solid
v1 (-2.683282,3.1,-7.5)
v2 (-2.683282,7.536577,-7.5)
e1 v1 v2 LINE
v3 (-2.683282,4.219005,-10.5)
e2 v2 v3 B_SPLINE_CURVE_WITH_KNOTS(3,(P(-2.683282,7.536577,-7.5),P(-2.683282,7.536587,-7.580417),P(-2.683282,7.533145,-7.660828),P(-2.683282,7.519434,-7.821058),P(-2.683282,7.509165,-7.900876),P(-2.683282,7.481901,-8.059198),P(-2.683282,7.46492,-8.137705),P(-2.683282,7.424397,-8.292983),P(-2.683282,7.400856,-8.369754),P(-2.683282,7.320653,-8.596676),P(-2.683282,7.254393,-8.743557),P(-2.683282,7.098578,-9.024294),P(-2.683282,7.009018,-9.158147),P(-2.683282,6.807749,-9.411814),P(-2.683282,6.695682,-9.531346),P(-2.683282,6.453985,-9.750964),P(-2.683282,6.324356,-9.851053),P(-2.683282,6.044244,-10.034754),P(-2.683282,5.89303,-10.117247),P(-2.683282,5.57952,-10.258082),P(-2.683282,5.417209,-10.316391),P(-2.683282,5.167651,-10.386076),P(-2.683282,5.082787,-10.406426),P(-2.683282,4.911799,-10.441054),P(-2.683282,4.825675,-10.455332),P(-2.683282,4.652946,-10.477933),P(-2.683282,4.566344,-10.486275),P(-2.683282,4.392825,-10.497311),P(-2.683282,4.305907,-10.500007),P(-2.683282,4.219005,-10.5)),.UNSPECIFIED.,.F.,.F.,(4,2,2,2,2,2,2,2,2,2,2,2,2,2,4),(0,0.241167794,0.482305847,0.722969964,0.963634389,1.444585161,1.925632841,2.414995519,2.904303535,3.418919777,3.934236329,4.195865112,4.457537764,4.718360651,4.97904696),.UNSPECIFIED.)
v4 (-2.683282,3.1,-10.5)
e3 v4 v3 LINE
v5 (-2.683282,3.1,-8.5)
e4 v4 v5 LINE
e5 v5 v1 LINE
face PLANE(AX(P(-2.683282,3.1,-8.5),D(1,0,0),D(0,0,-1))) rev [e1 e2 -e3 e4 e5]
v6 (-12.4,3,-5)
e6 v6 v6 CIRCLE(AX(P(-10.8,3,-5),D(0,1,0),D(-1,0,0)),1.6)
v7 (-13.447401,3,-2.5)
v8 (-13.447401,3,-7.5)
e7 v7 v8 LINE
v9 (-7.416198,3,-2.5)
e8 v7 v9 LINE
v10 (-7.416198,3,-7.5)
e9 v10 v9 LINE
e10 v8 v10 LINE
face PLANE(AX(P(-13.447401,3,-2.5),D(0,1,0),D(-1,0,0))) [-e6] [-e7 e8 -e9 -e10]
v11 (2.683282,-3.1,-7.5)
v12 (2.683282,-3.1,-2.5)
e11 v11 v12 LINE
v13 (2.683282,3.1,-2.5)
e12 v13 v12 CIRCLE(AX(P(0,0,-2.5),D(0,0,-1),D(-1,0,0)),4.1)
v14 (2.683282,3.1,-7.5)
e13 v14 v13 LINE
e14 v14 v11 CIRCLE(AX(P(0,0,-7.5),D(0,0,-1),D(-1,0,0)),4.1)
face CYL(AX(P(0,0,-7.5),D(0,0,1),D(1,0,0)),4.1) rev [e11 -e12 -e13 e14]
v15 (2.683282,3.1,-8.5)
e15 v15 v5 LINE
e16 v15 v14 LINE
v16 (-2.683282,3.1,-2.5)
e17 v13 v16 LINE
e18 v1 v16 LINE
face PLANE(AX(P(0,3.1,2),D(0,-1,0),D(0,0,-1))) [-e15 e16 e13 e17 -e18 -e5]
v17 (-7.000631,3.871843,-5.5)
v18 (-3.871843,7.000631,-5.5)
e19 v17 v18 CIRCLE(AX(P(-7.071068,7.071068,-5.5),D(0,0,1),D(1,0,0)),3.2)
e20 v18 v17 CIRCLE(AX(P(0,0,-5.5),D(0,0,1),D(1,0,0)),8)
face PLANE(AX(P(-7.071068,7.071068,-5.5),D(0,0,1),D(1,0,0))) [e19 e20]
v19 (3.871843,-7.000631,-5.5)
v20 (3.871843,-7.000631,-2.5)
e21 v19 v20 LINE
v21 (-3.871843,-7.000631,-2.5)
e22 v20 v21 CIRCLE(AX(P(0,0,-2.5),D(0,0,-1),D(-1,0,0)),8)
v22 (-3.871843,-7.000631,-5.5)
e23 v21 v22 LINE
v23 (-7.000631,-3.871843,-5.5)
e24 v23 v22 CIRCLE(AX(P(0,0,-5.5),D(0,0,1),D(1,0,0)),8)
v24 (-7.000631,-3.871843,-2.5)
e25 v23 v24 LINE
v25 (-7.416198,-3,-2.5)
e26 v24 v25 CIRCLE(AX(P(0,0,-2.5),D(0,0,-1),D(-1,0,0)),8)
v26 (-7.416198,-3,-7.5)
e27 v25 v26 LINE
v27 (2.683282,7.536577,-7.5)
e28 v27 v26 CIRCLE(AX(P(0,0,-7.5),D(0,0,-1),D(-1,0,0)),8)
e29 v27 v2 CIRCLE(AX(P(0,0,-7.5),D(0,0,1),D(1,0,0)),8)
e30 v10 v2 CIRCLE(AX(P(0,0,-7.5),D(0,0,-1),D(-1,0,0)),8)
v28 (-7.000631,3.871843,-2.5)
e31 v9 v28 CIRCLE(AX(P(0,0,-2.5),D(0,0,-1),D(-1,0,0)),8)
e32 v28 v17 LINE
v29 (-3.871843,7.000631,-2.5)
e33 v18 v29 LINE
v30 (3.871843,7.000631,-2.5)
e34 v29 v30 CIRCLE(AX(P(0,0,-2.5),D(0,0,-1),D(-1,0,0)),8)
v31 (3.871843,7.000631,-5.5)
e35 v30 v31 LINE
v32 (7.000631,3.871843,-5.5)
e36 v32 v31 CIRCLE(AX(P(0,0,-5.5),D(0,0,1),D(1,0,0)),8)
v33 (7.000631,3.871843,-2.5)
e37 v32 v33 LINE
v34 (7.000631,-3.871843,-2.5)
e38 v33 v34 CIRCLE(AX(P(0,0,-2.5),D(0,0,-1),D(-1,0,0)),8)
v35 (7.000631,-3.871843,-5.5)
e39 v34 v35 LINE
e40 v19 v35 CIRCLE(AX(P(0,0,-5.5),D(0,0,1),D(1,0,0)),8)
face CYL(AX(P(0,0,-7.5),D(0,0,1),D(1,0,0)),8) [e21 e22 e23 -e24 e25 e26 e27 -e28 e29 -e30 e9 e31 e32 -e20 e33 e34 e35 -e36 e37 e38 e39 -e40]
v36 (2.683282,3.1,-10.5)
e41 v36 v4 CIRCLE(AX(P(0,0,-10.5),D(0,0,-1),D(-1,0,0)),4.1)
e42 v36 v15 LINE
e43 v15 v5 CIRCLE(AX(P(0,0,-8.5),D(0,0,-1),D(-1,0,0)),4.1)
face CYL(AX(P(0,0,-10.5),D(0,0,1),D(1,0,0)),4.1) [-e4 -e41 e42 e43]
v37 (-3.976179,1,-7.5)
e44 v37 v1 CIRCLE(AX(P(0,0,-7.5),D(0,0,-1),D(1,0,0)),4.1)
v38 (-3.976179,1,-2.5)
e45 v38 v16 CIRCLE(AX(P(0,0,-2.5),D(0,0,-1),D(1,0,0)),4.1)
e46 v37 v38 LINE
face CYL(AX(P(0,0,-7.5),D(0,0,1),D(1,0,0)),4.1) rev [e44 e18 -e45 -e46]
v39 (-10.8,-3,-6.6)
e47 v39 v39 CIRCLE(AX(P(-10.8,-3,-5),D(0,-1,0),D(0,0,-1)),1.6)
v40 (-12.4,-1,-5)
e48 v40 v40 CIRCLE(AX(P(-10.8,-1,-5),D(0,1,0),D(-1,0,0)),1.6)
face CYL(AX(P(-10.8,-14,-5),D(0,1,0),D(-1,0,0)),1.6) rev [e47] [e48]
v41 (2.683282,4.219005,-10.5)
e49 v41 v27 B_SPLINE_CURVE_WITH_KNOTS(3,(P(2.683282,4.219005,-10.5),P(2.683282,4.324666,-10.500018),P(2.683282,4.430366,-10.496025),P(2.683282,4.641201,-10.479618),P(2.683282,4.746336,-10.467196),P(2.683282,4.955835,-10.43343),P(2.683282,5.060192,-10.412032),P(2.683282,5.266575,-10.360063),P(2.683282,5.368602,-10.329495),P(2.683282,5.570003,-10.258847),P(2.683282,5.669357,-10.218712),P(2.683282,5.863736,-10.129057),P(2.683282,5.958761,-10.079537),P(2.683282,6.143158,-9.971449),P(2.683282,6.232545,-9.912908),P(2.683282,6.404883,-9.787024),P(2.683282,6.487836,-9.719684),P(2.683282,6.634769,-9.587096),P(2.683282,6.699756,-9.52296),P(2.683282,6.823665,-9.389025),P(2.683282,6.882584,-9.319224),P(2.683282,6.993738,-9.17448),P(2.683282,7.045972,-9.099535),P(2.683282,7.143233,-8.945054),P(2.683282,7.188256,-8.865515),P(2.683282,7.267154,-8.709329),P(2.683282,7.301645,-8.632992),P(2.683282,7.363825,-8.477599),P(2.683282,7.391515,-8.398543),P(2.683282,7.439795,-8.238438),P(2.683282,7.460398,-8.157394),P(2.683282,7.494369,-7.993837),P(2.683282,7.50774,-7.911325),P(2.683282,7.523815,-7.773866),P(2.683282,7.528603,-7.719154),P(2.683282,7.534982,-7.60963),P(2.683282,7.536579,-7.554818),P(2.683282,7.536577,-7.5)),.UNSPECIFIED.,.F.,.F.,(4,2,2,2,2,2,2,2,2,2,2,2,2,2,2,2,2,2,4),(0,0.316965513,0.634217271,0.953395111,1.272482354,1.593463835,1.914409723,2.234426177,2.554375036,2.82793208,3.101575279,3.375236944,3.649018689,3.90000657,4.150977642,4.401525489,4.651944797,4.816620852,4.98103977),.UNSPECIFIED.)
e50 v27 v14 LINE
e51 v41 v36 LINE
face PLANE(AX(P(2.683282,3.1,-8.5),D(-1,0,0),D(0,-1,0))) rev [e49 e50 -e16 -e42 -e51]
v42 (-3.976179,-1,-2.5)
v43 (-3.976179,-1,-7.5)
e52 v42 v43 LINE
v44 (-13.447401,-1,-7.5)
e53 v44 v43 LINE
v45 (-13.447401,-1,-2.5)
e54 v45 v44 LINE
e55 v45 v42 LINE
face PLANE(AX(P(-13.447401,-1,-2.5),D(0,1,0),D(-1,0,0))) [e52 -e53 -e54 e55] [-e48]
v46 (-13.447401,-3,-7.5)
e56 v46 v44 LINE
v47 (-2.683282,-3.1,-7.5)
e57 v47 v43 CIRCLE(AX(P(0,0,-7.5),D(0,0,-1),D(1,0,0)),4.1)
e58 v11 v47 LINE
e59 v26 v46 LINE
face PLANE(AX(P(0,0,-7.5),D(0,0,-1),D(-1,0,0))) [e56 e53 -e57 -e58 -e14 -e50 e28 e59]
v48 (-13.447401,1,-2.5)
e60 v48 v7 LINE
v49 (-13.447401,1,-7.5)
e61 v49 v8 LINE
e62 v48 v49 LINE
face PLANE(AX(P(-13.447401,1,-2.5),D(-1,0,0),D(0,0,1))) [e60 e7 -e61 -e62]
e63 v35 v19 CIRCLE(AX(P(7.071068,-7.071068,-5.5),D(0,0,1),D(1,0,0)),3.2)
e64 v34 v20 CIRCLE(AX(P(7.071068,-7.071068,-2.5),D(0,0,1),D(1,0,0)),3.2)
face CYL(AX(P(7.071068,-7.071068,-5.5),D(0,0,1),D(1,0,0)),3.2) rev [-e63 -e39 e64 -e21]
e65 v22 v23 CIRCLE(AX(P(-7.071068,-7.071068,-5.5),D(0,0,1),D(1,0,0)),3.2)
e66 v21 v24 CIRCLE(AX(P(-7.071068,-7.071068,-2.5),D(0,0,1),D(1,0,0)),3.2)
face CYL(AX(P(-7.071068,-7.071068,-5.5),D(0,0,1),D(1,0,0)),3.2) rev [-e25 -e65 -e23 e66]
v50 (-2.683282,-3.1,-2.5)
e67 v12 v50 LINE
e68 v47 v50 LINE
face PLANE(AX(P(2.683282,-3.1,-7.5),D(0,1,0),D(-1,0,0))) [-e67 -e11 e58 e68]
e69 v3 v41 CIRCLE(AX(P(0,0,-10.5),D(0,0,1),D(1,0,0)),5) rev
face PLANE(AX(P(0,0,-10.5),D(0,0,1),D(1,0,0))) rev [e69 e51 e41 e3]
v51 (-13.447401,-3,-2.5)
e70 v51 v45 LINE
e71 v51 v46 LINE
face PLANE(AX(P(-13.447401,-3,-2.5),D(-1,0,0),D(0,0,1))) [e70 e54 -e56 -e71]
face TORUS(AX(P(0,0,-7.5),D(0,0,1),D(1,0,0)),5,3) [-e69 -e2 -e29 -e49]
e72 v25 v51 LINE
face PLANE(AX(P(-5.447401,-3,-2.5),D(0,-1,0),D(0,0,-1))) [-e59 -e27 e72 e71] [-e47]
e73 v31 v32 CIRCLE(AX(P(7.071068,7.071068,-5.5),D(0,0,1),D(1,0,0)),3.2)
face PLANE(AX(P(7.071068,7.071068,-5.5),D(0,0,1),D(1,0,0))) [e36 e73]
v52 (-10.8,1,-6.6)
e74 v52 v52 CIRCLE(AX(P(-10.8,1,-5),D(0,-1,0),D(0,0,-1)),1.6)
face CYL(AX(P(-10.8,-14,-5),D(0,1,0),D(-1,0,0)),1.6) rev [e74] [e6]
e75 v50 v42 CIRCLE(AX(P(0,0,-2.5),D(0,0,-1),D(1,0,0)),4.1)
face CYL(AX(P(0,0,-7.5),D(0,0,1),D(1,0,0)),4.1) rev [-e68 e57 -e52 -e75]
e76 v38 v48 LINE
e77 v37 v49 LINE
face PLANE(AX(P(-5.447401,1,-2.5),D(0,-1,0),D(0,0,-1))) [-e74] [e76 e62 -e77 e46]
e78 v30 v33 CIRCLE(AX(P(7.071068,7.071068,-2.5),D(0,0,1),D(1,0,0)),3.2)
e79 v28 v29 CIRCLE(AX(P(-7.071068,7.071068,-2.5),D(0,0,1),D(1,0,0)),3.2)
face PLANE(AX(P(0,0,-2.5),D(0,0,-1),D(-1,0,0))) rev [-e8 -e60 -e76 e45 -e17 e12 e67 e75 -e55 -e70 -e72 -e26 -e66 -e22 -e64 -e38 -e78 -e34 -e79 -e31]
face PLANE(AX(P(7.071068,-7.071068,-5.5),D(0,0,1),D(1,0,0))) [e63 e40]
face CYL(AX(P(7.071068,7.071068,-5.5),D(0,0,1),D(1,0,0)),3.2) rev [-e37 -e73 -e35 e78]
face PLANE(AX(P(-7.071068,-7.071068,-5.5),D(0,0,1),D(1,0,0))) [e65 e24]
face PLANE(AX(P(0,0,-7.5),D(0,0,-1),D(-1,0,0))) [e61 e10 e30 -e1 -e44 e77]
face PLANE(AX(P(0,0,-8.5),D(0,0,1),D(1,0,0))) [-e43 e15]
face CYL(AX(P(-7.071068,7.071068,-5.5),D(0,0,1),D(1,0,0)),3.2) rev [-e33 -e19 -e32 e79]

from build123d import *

# Parameters (mm, degrees)
SKETCH_1_R          = 14
SKETCH_1_R_2        = 1.5
EXTRUDE_1_DEPTH     = 2
CUT_EXTRUDE_1_DEPTH = 20.899748742
EXTRUDE_4_DEPTH     = 2.5
EXTRUDE_START       = 5
SKETCH_6_R          = 8
EXTRUDE_5_DEPTH     = 5
EXTRUDE_START_2     = 1
EXTRUDE_6_DEPTH     = 1
SKETCH_8_W          = 8
SKETCH_8_H          = 2
EXTRUDE_7_DEPTH     = 5
SKETCH_9_R          = 1.6
CUT_EXTRUDE_3_DEPTH = 24.606143268
EXTRUDE_START_3     = 2
EXTRUDE_8_DEPTH     = 2
SKETCH_11_W         = 12.041493288
SKETCH_11_H         = 2
CUT_EXTRUDE_4_DEPTH = 5
FILLET_2_R          = 3
CUT_EXTRUDE_START   = -4.5
SKETCH_12_R         = 14
CUT_EXTRUDE_5_DEPTH = 4.5
SKETCH_13_R         = 3.2
CUT_EXTRUDE_6_DEPTH = 3


with BuildPart() as part:
    # 草图1 → 凸台-拉伸1 (new body)
    with BuildSketch(Plane.XY):
        Circle(SKETCH_1_R)
        with Locations((-7.071067812, 7.071067812)):
            Circle(SKETCH_1_R_2, mode=Mode.SUBTRACT)
        with Locations((7.071067812, 7.071067812)):
            Circle(SKETCH_1_R_2, mode=Mode.SUBTRACT)
        with Locations((-7.071067812, -7.071067812)):
            Circle(SKETCH_1_R_2, mode=Mode.SUBTRACT)
        with Locations((7.071067812, -7.071067812)):
            Circle(SKETCH_1_R_2, mode=Mode.SUBTRACT)
    extrude(amount=EXTRUDE_1_DEPTH)

    # 草图2 → 切除-拉伸1 (cut, through all)
    with BuildSketch(Plane(origin=(0, 0, 0), x_dir=(-1, 0, 0), z_dir=(0, 0, -1))):
        with BuildLine():
            ThreePointArc((-2.683281573, 3.1), (-4.1, 0), (-2.683281573, -3.1))
            Line((-2.683281573, -3.1), (2.683281573, -3.1))
            ThreePointArc((2.683281573, -3.1), (4.1, 0), (2.683281573, 3.1))
            Line((2.683281573, 3.1), (-2.683281573, 3.1))
        make_face()
    extrude(amount=-CUT_EXTRUDE_1_DEPTH, mode=Mode.SUBTRACT)

    # 草图3 → 凸台-拉伸4 (add)
    with BuildSketch(Plane(origin=(0, 0, 0), x_dir=(-1, 0, 0), z_dir=(0, 0, -1))):
        Polygon((0, 3.1), (3.7, 3.1), (3.7, 7.1), (-3.7, 7.1), (-3.7, 3.1), align=None)
    extrude(amount=EXTRUDE_4_DEPTH)

    # 草图6 → 凸台-拉伸5 (add)
    with BuildSketch(Plane(origin=(0, 0, -2.5), x_dir=(-1, 0, 0), z_dir=(0, 0, -1)).offset(EXTRUDE_START)):
        Circle(SKETCH_6_R)
        with BuildLine():
            Line((-2.683281573, -3.1), (2.683281573, -3.1))
            ThreePointArc((2.683281573, -3.1), (4.1, 0), (2.683281573, 3.1))
            Line((2.683281573, 3.1), (-2.683281573, 3.1))
            ThreePointArc((-2.683281573, 3.1), (-4.1, 0), (-2.683281573, -3.1))
        make_face(mode=Mode.SUBTRACT)
    extrude(amount=-EXTRUDE_5_DEPTH)

    # 草图7 → 凸台-拉伸6 (add)
    with BuildSketch(Plane(origin=(0, 0, -7.5), x_dir=(-1, 0, 0), z_dir=(0, 0, -1)).offset(EXTRUDE_START_2)):
        with BuildLine():
            Line((-2.683281573, 3.1), (-2.683281573, 7.536577473))
            ThreePointArc((-2.683281573, 7.536577473), (0, 8), (2.683281573, 7.536577473))
            Line((2.683281573, 7.536577473), (2.683281573, 3.1))
            Line((2.683281573, 3.1), (-2.683281573, 3.1))
        make_face()
    extrude(amount=-EXTRUDE_6_DEPTH)

    # 草图8 → 凸台-拉伸7 (add)
    with BuildSketch(Plane(origin=(0, 0, -7.5), x_dir=(-1, 0, 0), z_dir=(0, 0, -1))):
        with Locations((9.447401339, 2)):
            Rectangle(SKETCH_8_W, SKETCH_8_H)
        with Locations((9.447401339, -2)):
            Rectangle(SKETCH_8_W, SKETCH_8_H)
    extrude(amount=-EXTRUDE_7_DEPTH)

    # 草图9 → 切除-拉伸3 (cut, through all)
    with BuildSketch(Plane(origin=(0, 3, 0), x_dir=(1, 0, 0), z_dir=(0, 1, 0))):
        with Locations((-10.8, 5)):
            Circle(SKETCH_9_R)
    extrude(amount=-CUT_EXTRUDE_3_DEPTH, mode=Mode.SUBTRACT)

    # 草图10 → 凸台-拉伸8 (add)
    with BuildSketch(Plane(origin=(0, 0, -8.5), x_dir=(-1, 0, 0), z_dir=(0, 0, -1)).offset(EXTRUDE_START_3)):
        with BuildLine():
            Line((-2.683281573, 7.536577473), (-2.683281573, 3.1))
            ThreePointArc((-2.683281573, 3.1), (0, -4.1), (2.683281573, 3.1))
            Line((2.683281573, 3.1), (2.683281573, 7.536577473))
            ThreePointArc((2.683281573, 7.536577473), (0, 8), (-2.683281573, 7.536577473))
        make_face()
    extrude(amount=-EXTRUDE_8_DEPTH)

    # 草图11 → 切除-拉伸4 (cut)
    with BuildSketch(Plane(origin=(0, 0, -7.5), x_dir=(-1, 0, 0), z_dir=(0, 0, -1))):
        with Locations((7.426654695, 0)):
            Rectangle(SKETCH_11_W, SKETCH_11_H)
    extrude(amount=-CUT_EXTRUDE_4_DEPTH, mode=Mode.SUBTRACT)

    # 圆角2
    fillet_2_edges = [part.edges().sort_by_distance(p)[0] for p in [
        (0, 8, -10.5),
    ]]
    fillet(fillet_2_edges, radius=FILLET_2_R)

    # 草图12 → 切除-拉伸5 (cut)
    with BuildSketch(Plane.XY.offset(2).offset(CUT_EXTRUDE_START)):
        Circle(SKETCH_12_R)
    extrude(amount=CUT_EXTRUDE_5_DEPTH, mode=Mode.SUBTRACT)

    # 草图13 → 切除-拉伸6 (cut)
    with BuildSketch(Plane.XY.offset(-2.5)):
        with Locations((-7.071067812, 7.071067812)):
            Circle(SKETCH_13_R)
        with Locations((7.071067812, 7.071067812)):
            Circle(SKETCH_13_R)
        with Locations((-7.071067812, -7.071067812)):
            Circle(SKETCH_13_R)
        with Locations((7.071067812, -7.071067812)):
            Circle(SKETCH_13_R)
    extrude(amount=-CUT_EXTRUDE_6_DEPTH, mode=Mode.SUBTRACT)


solid = part.part
